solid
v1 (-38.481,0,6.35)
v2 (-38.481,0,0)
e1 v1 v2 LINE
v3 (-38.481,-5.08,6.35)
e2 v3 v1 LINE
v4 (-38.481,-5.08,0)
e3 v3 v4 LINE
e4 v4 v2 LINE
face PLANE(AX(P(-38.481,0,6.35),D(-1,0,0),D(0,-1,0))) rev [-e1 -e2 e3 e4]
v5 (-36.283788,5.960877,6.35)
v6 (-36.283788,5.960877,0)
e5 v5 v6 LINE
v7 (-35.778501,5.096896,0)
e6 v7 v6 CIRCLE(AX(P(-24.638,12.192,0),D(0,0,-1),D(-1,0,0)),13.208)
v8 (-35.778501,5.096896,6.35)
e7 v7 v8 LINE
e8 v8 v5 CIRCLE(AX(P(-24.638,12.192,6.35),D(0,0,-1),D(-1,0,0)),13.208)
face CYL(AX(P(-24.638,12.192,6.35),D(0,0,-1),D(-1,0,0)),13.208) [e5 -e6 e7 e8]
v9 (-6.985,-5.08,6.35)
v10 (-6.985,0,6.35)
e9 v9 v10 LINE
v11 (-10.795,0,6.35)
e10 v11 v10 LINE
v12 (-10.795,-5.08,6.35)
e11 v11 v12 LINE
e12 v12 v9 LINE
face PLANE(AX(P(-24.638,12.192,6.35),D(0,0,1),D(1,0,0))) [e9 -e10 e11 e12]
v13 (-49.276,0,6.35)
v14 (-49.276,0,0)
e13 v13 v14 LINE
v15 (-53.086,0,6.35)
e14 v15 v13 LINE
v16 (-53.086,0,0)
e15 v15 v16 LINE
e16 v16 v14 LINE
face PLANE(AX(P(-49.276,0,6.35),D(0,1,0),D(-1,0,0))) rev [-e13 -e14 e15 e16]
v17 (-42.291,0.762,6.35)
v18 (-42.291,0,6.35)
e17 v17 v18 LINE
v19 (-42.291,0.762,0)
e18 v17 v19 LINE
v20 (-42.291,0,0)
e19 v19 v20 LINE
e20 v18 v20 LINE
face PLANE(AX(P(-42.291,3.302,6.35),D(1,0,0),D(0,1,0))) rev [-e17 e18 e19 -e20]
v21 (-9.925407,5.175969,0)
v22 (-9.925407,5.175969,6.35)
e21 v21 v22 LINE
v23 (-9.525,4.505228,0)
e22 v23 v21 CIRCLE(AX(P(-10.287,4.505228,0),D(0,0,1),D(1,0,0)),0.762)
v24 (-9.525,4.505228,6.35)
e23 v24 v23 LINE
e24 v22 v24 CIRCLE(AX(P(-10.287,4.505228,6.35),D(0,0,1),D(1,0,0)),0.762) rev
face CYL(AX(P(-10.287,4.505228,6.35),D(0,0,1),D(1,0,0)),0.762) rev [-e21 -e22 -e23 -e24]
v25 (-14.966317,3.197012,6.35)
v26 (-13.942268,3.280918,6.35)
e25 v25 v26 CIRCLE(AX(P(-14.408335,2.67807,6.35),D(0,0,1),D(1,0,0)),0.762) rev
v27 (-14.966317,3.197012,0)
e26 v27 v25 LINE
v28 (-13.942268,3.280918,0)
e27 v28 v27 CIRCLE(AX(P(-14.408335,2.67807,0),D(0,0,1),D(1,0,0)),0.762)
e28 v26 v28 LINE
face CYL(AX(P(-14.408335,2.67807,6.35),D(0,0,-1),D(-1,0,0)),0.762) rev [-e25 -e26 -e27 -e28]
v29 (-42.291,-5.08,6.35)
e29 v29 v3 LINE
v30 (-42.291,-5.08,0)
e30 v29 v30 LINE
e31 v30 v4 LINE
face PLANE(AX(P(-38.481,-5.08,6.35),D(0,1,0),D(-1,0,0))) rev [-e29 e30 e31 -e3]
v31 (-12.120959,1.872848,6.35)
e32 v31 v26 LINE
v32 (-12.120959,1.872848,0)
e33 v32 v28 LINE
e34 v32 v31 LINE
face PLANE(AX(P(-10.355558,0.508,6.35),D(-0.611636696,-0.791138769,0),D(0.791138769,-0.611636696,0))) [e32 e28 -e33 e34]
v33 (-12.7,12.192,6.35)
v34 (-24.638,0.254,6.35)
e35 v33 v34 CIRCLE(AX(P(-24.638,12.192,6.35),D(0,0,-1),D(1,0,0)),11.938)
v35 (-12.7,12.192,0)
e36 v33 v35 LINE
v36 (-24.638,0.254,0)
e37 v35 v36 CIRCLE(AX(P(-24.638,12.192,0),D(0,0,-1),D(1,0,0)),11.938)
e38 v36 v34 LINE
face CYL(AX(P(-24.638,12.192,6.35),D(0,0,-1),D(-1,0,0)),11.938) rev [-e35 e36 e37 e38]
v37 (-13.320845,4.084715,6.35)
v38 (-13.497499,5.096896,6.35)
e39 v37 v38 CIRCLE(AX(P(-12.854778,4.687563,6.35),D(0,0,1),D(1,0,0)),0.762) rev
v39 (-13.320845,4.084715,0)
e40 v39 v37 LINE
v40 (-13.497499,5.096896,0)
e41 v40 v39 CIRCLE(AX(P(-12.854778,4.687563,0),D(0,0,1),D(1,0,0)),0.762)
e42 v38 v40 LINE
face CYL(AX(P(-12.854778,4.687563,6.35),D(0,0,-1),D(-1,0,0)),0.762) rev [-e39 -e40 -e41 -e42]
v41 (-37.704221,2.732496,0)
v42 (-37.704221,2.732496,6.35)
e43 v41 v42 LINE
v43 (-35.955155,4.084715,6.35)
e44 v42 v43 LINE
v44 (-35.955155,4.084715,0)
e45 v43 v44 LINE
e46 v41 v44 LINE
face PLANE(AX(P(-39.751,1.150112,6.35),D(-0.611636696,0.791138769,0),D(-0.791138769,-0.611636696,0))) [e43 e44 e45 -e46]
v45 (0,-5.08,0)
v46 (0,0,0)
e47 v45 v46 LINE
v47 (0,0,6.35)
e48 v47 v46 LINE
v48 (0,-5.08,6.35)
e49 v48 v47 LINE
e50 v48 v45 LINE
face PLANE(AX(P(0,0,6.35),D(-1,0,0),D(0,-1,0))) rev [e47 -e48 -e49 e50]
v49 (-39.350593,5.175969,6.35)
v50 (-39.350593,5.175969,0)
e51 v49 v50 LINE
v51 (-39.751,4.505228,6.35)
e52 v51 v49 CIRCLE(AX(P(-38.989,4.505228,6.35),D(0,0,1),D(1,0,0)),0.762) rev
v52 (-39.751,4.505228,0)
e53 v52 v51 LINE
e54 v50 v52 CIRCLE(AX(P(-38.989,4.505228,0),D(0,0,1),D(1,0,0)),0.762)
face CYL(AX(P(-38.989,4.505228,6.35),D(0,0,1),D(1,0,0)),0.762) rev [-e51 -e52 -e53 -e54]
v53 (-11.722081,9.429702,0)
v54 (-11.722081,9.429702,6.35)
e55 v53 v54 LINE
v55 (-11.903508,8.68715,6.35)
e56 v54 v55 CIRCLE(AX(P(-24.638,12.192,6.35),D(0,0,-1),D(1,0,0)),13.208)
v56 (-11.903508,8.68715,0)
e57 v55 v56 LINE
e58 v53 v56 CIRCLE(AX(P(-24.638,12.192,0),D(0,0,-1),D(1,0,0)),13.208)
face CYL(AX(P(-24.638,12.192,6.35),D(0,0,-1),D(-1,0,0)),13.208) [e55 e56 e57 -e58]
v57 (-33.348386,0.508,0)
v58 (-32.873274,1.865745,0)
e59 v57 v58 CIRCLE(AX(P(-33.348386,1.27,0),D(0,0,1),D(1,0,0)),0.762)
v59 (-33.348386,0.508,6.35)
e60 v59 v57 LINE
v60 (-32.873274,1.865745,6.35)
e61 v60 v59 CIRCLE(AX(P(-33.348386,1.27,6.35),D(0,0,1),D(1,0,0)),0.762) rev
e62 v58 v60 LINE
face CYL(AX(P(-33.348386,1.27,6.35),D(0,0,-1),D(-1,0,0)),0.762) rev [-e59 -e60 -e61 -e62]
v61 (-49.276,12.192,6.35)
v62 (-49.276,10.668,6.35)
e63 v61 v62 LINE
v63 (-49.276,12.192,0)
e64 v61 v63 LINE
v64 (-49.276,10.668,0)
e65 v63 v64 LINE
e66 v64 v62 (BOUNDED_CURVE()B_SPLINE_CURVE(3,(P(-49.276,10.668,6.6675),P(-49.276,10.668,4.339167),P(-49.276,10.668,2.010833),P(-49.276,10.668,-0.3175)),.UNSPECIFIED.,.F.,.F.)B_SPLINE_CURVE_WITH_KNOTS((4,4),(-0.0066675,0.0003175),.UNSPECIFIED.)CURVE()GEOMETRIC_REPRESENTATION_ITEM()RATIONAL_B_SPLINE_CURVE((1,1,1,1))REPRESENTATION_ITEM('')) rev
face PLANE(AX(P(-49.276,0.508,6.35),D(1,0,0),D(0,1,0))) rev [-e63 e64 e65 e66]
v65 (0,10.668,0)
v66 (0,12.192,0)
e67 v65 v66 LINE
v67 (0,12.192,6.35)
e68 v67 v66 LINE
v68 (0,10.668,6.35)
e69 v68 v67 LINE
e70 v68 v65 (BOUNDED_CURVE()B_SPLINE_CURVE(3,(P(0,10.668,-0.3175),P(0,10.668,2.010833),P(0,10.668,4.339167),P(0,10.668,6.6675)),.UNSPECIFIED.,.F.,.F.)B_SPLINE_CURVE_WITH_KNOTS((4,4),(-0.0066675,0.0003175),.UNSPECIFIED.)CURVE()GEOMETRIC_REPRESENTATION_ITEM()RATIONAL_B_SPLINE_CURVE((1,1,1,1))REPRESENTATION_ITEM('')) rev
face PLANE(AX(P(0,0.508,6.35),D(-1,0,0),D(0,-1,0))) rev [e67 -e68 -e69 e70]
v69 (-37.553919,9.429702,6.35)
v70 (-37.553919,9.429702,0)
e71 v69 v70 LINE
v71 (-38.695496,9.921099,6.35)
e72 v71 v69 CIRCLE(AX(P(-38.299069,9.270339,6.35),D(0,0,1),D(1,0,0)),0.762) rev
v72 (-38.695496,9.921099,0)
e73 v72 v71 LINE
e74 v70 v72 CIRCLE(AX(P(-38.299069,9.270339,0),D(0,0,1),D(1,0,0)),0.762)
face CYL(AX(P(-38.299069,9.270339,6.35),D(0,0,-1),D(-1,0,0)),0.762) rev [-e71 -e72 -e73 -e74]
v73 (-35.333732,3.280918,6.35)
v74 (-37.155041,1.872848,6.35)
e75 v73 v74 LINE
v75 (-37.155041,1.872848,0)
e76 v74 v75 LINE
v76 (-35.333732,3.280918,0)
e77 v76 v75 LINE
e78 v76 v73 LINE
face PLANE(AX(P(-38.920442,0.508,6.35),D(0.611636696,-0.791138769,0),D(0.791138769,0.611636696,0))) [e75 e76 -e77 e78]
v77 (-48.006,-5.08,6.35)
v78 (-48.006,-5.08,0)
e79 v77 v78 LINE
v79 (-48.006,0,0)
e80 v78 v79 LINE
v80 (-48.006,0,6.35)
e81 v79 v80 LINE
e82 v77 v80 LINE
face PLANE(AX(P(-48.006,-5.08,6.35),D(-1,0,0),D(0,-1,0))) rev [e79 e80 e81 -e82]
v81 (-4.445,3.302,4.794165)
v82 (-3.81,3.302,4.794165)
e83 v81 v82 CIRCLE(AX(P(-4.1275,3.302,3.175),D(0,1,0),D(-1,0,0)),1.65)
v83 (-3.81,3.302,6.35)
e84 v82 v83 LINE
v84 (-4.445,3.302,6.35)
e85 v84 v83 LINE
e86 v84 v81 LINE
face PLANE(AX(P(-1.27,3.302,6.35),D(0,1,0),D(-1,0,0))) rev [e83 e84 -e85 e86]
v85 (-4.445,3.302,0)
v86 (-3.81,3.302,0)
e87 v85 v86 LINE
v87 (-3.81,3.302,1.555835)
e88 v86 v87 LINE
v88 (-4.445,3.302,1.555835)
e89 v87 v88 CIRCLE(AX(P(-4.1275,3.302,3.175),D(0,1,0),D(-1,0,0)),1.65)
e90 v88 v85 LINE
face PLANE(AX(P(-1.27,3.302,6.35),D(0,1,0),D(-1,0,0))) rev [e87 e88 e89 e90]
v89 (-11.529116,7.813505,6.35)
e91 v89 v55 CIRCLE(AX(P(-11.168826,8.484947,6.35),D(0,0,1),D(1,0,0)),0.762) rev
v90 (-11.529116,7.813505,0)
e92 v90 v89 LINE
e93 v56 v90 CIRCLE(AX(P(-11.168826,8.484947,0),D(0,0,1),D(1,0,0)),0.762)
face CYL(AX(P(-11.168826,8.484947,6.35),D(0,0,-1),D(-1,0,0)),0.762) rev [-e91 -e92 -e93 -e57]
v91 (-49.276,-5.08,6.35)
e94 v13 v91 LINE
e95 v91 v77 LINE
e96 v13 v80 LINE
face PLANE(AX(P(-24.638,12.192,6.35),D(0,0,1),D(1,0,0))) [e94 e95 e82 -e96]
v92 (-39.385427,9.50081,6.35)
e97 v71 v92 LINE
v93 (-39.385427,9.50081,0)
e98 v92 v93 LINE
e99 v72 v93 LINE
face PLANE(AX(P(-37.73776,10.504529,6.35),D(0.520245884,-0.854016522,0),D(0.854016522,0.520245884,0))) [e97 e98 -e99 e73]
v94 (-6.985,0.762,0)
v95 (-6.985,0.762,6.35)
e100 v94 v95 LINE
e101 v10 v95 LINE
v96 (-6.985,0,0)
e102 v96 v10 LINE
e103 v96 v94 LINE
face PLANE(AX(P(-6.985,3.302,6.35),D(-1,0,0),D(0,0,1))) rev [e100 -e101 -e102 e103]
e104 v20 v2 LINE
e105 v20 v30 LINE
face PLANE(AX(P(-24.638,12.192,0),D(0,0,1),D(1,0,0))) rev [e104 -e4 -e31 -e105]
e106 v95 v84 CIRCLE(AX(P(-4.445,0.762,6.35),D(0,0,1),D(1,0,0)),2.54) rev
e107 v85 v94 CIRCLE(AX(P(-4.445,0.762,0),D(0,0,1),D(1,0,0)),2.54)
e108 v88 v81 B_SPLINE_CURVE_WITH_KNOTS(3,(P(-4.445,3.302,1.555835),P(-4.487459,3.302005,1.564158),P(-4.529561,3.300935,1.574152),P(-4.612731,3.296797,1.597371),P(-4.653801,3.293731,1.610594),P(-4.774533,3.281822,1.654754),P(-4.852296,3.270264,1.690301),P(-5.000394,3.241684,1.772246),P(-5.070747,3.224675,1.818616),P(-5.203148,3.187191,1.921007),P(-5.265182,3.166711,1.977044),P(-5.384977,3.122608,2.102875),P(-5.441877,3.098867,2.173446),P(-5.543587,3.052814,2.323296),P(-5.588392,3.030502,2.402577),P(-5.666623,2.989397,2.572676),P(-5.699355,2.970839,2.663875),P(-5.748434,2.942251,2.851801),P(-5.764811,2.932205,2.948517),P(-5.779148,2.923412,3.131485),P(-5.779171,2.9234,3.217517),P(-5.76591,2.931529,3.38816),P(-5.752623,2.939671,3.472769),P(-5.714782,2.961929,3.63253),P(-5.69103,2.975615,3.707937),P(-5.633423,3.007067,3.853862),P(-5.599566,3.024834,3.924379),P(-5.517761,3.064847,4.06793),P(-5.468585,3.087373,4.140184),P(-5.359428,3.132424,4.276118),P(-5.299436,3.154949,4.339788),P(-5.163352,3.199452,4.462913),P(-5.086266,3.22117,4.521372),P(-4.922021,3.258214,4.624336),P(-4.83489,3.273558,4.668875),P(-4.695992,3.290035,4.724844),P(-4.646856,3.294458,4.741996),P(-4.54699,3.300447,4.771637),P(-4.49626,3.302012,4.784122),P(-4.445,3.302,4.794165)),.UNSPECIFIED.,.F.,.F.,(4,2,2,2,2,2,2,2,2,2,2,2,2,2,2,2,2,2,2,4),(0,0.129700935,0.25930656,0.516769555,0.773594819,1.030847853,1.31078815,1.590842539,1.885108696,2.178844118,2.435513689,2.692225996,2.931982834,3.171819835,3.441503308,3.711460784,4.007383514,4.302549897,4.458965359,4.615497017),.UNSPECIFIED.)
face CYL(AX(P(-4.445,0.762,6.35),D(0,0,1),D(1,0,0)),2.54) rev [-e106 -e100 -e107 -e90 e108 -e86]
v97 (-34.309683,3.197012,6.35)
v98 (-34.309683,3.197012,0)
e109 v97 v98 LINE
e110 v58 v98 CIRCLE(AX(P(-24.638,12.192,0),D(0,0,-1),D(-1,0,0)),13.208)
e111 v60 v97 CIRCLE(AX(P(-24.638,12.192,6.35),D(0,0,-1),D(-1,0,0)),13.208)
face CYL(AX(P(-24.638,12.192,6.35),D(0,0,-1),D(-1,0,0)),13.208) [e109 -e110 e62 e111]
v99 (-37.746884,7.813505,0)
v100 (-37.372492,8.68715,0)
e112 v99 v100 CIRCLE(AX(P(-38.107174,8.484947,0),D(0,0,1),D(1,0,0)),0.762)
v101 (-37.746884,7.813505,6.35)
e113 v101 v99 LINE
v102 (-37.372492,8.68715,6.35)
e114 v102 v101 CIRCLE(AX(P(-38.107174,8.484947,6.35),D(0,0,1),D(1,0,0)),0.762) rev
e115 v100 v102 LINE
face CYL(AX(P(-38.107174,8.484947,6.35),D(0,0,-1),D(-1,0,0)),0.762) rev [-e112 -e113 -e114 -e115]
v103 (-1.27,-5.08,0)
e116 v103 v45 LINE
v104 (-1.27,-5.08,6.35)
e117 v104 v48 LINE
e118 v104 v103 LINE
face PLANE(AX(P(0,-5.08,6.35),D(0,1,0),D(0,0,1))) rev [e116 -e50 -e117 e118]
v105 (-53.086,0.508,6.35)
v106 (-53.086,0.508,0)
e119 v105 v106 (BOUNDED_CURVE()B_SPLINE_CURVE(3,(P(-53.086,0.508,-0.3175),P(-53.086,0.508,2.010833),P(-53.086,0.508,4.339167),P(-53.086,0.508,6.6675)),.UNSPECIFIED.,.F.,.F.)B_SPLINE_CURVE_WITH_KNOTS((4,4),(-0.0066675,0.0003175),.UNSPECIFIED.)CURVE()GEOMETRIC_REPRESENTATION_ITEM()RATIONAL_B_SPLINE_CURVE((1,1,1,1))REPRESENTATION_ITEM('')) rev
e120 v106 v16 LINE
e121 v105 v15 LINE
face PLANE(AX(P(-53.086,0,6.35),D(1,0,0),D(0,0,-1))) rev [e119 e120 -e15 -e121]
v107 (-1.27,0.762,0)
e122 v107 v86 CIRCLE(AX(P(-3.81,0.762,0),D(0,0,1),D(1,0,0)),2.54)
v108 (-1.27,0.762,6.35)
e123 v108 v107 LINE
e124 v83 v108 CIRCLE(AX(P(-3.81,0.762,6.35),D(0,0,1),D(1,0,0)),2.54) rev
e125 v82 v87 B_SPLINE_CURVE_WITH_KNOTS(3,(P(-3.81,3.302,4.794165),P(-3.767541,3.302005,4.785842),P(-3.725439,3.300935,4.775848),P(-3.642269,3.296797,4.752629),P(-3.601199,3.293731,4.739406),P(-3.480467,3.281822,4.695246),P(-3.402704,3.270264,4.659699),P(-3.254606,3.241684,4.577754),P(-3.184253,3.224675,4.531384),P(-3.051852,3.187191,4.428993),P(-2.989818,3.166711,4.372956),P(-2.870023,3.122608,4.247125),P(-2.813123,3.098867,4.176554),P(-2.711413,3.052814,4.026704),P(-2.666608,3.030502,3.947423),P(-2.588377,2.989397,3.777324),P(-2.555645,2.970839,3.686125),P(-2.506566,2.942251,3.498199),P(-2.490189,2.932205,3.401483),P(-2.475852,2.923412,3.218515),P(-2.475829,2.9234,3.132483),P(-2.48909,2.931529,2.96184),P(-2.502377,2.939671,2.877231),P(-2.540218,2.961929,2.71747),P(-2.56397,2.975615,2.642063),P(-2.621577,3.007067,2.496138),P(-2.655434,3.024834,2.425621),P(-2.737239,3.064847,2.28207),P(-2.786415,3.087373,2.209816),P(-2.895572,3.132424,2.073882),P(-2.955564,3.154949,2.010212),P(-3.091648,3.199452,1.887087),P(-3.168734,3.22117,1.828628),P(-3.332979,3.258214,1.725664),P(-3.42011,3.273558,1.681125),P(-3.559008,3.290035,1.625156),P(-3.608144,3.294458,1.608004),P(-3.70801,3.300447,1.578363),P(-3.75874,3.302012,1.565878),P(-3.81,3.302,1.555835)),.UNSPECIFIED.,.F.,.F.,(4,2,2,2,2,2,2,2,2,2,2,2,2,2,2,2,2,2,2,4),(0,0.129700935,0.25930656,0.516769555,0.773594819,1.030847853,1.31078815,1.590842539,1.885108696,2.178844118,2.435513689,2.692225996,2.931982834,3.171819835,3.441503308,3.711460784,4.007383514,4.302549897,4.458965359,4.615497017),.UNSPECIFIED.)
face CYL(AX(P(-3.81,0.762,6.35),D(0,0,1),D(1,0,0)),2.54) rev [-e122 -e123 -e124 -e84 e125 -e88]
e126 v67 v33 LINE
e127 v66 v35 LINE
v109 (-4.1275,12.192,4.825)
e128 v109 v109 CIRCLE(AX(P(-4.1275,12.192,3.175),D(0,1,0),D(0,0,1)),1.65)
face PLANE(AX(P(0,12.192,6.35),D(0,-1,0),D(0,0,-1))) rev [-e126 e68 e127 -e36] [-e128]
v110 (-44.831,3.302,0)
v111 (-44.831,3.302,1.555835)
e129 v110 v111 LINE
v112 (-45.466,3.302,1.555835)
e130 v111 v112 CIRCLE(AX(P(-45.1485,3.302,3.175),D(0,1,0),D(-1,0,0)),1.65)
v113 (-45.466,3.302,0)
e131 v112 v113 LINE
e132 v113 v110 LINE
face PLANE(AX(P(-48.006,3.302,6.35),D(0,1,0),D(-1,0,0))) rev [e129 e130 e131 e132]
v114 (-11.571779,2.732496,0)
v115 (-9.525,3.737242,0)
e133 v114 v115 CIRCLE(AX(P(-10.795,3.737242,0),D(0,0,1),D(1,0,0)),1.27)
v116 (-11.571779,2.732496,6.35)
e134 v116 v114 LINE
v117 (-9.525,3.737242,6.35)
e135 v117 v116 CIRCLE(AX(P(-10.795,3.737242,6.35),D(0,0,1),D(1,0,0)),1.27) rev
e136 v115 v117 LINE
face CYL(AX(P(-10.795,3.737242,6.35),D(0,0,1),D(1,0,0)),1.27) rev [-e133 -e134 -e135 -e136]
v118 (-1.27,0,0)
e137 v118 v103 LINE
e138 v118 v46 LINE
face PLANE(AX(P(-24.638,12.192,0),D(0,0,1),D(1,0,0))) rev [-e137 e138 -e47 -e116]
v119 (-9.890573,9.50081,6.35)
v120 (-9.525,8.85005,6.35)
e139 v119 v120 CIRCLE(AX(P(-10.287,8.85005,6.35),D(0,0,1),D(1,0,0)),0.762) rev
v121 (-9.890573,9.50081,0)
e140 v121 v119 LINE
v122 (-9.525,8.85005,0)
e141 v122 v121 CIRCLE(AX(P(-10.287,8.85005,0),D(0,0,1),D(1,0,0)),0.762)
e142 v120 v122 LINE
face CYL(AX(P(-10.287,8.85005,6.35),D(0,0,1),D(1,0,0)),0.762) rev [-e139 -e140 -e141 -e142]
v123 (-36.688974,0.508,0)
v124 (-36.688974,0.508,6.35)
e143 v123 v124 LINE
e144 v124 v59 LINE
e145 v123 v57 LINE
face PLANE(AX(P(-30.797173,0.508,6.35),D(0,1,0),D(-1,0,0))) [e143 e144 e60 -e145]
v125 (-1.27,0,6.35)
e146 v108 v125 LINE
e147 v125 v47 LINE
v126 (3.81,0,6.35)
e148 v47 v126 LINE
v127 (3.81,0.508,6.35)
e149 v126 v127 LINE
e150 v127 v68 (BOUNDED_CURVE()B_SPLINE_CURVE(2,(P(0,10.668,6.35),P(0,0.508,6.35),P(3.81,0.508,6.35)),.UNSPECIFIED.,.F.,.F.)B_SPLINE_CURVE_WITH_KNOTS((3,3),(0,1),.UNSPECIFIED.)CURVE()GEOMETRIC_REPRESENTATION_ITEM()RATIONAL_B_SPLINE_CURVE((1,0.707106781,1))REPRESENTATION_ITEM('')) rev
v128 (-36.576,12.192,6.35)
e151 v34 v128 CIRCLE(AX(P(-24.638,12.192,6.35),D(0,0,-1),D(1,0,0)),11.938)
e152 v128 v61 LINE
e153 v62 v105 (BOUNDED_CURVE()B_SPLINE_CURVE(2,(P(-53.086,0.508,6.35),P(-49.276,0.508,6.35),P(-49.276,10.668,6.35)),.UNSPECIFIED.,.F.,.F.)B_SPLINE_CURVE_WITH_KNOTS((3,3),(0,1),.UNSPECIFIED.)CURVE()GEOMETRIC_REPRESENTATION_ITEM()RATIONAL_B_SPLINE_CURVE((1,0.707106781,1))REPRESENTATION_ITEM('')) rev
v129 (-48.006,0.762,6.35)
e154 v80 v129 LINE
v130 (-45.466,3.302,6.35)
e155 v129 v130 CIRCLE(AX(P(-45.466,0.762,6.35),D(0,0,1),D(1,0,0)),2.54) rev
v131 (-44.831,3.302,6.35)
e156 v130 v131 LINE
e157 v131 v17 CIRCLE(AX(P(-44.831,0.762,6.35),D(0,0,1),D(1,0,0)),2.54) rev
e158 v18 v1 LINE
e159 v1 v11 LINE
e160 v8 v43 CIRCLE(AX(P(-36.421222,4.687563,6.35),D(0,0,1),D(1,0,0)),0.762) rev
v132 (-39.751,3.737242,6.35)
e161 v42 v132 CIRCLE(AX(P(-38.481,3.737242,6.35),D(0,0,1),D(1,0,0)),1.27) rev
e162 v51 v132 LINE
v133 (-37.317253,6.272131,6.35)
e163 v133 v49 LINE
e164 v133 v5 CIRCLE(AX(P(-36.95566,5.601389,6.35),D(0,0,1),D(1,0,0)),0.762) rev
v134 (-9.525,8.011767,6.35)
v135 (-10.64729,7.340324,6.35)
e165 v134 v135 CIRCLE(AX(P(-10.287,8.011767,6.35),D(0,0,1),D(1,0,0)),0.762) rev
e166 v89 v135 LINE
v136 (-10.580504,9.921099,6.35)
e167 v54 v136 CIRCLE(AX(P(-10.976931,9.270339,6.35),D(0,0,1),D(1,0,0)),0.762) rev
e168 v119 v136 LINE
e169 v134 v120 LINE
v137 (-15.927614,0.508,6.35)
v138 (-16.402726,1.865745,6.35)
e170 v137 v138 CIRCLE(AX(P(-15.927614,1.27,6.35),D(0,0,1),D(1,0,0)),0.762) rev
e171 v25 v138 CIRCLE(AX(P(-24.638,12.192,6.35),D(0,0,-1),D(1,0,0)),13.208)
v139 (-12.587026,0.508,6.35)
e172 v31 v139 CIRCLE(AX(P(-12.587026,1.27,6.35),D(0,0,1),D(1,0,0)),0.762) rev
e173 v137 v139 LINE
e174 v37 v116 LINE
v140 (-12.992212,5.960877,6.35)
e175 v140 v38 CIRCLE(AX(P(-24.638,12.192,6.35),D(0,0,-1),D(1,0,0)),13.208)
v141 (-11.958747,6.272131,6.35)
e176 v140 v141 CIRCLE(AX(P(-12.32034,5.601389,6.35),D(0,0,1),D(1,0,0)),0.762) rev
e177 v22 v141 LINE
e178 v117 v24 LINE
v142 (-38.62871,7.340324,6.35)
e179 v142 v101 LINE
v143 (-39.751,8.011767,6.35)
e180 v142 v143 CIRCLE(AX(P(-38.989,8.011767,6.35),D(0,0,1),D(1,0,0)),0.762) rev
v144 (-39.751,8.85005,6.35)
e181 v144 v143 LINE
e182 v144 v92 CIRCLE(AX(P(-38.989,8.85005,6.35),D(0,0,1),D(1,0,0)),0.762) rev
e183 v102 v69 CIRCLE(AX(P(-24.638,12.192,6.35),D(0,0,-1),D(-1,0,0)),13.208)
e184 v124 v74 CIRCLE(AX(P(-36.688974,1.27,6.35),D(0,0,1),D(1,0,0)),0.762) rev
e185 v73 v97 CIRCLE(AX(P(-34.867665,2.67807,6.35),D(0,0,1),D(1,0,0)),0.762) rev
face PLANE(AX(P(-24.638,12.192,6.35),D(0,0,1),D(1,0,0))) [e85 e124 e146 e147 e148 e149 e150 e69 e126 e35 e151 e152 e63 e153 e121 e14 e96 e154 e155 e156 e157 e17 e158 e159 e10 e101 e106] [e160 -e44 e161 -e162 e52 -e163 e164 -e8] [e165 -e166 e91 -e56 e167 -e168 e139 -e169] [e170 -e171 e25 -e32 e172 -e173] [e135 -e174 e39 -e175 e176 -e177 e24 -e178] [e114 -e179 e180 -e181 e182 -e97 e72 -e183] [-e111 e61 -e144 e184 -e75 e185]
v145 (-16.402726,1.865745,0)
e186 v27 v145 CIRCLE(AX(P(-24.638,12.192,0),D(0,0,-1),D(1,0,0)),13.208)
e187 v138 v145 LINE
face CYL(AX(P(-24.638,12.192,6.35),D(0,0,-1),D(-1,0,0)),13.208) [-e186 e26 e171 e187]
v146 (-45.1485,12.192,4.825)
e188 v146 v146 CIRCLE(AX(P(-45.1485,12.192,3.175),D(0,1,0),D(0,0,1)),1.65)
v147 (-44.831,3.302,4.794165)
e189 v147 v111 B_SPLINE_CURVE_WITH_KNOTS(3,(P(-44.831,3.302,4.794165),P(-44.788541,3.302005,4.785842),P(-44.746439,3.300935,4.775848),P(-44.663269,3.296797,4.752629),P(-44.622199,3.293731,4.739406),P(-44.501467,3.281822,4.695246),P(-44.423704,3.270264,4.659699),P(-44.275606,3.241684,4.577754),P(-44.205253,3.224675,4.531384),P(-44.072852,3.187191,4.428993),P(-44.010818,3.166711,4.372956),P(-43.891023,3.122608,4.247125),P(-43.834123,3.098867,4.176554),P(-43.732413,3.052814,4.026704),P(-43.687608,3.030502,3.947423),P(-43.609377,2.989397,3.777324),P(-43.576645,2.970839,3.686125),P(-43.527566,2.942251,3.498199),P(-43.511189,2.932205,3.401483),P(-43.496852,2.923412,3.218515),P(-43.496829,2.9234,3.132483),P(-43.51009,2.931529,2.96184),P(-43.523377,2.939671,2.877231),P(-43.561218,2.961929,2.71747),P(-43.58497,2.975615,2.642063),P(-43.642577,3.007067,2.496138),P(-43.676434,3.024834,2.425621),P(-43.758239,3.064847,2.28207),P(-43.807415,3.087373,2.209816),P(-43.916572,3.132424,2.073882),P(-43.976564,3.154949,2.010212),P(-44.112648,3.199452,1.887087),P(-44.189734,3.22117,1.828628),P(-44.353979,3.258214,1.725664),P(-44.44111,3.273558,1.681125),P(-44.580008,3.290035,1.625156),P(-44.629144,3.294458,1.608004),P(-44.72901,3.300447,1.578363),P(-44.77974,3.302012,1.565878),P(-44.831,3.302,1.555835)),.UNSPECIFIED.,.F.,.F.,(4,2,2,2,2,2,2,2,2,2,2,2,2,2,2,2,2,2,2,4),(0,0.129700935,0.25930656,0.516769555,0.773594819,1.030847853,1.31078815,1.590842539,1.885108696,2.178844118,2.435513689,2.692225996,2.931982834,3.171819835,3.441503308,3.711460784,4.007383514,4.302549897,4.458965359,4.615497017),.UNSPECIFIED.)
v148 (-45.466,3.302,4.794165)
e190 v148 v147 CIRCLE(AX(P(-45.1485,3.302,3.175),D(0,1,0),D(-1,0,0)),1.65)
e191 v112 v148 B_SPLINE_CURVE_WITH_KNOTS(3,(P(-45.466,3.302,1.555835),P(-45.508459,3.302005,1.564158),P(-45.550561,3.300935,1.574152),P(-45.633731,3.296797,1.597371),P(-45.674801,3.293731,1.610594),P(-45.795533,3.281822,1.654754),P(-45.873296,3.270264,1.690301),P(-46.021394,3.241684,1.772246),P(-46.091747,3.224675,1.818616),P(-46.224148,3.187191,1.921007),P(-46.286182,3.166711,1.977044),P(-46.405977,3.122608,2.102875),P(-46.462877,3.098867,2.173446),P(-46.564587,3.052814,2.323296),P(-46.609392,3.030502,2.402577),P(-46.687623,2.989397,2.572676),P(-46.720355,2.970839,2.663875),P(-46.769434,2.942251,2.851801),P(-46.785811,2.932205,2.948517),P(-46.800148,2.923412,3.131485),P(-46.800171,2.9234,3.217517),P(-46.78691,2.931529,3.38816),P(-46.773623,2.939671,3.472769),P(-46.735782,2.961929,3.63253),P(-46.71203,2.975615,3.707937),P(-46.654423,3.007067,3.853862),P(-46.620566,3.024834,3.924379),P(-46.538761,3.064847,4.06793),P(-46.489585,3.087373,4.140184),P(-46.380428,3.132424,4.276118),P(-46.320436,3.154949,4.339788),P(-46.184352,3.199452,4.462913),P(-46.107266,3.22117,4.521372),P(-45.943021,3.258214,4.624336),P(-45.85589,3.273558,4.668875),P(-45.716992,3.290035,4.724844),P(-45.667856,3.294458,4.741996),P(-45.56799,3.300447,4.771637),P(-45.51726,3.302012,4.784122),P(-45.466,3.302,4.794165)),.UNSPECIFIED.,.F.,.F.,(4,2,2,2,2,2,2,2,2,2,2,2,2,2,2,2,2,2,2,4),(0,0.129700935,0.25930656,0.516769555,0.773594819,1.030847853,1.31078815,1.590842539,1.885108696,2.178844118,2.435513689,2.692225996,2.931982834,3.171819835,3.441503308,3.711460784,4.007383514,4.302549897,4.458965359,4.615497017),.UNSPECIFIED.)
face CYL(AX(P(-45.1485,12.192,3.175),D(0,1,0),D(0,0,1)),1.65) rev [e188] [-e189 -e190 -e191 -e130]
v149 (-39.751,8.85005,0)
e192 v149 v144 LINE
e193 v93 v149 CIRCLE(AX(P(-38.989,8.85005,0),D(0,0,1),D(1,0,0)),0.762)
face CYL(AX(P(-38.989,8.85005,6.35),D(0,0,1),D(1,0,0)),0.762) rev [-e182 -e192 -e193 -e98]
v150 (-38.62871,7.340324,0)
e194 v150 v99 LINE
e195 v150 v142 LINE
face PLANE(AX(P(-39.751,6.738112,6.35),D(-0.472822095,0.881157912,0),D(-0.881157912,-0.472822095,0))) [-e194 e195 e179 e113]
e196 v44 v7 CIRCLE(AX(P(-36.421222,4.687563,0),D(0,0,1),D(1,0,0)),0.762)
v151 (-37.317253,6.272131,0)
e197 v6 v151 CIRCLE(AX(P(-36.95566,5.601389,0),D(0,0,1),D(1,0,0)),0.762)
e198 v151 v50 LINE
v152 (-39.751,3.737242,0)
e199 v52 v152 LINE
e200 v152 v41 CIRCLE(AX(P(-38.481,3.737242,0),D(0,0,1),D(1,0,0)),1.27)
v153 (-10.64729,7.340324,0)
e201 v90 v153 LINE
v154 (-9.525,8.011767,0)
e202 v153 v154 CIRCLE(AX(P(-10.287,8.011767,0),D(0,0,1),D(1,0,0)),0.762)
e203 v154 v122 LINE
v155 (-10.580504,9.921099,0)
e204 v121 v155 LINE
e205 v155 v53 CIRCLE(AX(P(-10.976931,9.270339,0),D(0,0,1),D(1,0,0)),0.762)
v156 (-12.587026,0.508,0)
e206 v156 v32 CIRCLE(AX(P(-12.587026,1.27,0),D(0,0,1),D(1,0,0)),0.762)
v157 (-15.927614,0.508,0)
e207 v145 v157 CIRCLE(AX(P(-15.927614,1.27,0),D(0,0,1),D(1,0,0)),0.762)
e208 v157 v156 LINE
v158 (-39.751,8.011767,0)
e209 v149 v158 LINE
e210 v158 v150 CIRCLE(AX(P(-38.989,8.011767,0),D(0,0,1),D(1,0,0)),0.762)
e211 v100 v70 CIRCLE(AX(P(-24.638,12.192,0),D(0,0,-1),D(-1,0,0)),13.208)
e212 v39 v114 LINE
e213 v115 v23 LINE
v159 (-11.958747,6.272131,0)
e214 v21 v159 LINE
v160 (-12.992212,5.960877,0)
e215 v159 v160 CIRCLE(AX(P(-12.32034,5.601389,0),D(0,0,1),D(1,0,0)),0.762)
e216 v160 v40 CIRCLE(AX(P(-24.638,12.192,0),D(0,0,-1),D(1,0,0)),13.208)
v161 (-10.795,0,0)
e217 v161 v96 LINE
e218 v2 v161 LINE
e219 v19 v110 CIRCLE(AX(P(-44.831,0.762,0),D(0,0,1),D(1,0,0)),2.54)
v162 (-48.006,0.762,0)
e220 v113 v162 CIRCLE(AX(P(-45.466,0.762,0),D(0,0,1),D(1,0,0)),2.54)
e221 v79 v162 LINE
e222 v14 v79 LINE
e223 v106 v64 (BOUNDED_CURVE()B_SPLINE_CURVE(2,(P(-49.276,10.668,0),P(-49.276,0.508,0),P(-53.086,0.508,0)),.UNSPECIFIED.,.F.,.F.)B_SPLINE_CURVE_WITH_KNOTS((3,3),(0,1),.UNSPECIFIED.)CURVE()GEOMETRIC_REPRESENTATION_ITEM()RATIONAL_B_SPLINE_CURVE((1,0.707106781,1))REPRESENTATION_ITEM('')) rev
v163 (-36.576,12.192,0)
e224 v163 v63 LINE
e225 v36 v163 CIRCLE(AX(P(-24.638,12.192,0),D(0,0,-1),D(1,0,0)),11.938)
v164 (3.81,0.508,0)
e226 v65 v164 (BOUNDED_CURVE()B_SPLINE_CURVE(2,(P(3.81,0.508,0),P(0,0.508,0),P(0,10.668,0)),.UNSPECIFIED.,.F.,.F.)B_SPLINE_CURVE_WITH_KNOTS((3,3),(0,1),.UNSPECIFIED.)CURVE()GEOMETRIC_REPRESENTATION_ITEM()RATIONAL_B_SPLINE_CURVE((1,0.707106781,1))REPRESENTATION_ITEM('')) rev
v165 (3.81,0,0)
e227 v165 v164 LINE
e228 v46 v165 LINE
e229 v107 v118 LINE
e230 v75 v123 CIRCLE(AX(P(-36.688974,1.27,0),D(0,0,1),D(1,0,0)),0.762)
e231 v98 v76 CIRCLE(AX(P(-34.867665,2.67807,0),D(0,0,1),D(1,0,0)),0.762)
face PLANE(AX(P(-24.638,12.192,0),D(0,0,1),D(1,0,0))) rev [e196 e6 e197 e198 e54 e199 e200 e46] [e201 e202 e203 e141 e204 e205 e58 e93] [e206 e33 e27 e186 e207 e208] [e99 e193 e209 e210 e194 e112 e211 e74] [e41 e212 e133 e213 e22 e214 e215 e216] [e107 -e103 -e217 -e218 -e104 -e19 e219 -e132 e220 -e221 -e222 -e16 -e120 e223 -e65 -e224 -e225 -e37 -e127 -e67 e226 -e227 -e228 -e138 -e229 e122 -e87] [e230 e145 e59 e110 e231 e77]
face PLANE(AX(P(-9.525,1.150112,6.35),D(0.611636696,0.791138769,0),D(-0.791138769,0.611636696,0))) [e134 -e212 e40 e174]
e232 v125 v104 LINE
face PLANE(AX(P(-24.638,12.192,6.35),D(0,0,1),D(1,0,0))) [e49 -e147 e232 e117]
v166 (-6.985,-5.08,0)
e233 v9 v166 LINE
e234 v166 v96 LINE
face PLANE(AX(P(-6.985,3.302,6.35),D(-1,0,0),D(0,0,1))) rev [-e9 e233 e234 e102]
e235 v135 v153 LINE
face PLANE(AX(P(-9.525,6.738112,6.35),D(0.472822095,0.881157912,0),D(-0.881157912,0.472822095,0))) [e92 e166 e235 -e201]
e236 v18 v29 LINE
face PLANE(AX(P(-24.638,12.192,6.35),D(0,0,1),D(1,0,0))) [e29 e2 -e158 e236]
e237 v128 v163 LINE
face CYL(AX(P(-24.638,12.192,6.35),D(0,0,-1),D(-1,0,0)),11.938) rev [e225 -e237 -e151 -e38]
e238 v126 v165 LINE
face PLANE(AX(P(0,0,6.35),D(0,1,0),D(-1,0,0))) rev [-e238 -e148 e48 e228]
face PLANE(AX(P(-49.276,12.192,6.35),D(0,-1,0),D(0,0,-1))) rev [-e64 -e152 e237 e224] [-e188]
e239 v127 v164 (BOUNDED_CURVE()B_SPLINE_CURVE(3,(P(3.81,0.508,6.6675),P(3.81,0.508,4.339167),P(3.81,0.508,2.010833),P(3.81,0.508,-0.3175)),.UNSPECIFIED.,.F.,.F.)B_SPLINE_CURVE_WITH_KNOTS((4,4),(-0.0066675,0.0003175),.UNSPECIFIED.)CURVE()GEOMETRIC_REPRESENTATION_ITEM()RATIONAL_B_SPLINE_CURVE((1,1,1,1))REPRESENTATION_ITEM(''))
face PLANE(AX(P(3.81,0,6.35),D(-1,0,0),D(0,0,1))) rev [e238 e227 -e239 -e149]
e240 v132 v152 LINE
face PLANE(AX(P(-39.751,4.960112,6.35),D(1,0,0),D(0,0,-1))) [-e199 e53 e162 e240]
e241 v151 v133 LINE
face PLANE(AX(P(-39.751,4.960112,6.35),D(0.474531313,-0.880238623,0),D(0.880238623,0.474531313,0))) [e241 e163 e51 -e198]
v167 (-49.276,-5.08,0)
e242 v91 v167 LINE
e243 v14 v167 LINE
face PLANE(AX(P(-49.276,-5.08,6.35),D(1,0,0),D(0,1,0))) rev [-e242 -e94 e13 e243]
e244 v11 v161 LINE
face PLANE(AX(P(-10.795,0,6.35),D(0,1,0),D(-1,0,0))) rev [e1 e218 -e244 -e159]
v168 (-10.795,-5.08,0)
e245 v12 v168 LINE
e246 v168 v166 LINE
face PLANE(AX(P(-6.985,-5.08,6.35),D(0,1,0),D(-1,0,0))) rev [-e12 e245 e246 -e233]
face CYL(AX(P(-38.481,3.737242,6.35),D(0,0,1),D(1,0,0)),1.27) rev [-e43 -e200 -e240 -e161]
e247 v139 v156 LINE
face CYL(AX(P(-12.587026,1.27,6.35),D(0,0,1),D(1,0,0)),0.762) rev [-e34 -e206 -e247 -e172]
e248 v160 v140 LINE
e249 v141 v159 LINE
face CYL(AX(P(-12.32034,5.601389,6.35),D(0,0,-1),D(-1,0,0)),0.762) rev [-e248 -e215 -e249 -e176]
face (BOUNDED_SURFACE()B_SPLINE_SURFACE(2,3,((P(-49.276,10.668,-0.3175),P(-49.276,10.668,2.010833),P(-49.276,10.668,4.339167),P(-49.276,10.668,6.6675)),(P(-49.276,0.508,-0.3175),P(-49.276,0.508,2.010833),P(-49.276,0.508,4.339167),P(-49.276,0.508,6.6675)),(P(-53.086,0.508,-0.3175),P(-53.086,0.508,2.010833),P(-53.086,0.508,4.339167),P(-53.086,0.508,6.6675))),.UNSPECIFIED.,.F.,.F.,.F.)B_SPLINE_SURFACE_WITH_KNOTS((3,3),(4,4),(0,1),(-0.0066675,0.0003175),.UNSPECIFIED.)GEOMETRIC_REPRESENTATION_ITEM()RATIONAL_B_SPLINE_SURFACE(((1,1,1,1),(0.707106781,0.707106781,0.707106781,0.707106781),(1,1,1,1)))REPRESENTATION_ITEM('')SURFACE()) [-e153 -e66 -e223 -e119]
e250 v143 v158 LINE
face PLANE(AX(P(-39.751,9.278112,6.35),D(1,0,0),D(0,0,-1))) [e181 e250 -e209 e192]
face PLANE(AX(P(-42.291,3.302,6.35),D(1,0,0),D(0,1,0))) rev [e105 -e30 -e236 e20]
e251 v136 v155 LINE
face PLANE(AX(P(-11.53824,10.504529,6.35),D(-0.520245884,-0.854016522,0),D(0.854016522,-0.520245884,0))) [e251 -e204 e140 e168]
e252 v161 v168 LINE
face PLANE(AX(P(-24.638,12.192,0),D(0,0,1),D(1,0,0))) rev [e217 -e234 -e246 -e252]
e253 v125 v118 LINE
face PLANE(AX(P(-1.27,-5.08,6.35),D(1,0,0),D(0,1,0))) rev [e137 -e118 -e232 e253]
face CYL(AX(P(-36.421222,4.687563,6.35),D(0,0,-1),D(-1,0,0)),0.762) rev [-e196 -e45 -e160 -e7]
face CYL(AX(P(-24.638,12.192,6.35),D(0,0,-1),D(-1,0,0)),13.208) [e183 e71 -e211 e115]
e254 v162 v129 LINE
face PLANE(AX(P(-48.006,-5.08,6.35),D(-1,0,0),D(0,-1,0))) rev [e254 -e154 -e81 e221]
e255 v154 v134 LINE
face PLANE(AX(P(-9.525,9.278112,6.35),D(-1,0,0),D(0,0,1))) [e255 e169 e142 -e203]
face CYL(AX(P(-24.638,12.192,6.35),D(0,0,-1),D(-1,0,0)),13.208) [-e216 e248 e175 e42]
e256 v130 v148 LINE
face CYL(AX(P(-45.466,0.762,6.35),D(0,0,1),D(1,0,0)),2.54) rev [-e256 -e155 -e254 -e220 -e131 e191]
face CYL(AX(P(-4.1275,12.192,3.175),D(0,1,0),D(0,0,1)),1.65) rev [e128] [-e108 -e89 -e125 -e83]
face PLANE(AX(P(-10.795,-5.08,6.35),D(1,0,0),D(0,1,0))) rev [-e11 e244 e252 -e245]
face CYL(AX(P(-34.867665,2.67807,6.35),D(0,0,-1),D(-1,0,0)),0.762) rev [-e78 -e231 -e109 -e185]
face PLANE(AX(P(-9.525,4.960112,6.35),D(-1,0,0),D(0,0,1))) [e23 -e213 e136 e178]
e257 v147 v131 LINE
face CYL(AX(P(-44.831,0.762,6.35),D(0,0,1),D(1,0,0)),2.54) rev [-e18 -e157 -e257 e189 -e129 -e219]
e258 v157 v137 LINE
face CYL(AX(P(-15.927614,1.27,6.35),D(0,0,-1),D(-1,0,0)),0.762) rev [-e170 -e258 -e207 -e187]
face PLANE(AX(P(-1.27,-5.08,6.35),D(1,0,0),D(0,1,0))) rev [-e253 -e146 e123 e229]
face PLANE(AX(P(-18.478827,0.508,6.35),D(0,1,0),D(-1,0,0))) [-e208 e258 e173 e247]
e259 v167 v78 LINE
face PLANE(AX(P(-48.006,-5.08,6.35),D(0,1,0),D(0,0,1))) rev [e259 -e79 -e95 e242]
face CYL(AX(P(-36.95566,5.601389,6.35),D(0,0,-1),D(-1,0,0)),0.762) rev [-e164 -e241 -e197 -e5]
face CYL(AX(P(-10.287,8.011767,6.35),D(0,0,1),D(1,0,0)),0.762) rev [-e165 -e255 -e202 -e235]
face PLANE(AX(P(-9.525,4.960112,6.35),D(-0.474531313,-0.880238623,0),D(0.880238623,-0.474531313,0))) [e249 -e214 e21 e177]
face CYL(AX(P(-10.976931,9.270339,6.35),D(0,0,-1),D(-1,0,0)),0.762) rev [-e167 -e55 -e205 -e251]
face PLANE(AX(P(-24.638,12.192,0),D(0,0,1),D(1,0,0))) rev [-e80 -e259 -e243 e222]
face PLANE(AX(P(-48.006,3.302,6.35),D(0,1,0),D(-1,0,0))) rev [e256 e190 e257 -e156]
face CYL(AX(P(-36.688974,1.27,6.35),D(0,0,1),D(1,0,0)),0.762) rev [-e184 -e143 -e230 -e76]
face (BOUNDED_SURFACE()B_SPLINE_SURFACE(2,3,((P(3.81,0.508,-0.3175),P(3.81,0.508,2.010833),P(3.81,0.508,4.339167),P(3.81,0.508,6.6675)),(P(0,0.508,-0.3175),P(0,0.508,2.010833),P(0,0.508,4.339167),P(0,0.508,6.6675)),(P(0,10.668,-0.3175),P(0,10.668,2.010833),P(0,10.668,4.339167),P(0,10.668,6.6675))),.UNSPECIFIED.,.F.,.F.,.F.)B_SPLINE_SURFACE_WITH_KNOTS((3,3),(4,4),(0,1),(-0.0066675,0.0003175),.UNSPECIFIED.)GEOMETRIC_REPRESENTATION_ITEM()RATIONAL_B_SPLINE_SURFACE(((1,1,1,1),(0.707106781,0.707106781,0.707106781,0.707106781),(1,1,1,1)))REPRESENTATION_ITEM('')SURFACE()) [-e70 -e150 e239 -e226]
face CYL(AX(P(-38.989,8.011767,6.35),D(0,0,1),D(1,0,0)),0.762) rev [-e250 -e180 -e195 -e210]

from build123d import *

# Parameters (mm, degrees)
BOSS_EXTRUDE1_DEPTH   = 6.35
FILLET2_R             = 2.54
FILLET5_SIZE          = 10.16
FILLET5_SIZE_2        = 3.81
FILLET3_R             = 0.762
FILLET4_R             = 1.27
M4X0_7_TAPPED_HOLE1_D = 3.3


with BuildPart() as part:
    # Sketch1 → Boss-Extrude1 (new body)
    with BuildSketch(Plane.XY):
        with BuildLine():
            Line((-49.276, 0.508), (-49.276, 12.192))
            Line((-49.276, 12.192), (-36.576, 12.192))
            ThreePointArc((-36.576, 12.192), (-24.638, 0.254), (-12.7, 12.192))
            Line((-12.7, 12.192), (0, 12.192))
            Line((0, 12.192), (0, 0.508))
            Line((0, 0.508), (3.81, 0.508))
            Line((3.81, 0.508), (3.81, 0))
            Line((3.81, 0), (0, 0))
            Line((0, 0), (0, -5.08))
            Line((0, -5.08), (-1.27, -5.08))
            Line((-1.27, -5.08), (-1.27, 3.302))
            Line((-1.27, 3.302), (-6.985, 3.302))
            Line((-6.985, 3.302), (-6.985, -5.08))
            Line((-6.985, -5.08), (-10.795, -5.08))
            Line((-10.795, -5.08), (-10.795, 0))
            Line((-10.795, 0), (-38.481, 0))
            Line((-38.481, 0), (-38.481, -5.08))
            Line((-38.481, -5.08), (-42.291, -5.08))
            Line((-42.291, -5.08), (-42.291, 3.302))
            Line((-42.291, 3.302), (-48.006, 3.302))
            Line((-48.006, 3.302), (-48.006, -5.08))
            Line((-48.006, -5.08), (-49.276, -5.08))
            Line((-49.276, -5.08), (-49.276, 0))
            Line((-49.276, 0), (-53.086, 0))
            Line((-53.086, 0), (-53.086, 0.508))
            Line((-53.086, 0.508), (-49.276, 0.508))
        make_face()
        with BuildLine():
            Line((-18.478827328, 0.508), (-10.355558408, 0.508))
            Line((-10.355558408, 0.508), (-14.507082252, 3.71758146))
            ThreePointArc((-14.507082252, 3.71758146), (-16.336366742, 1.919018483), (-18.478827328, 0.508))
        make_face(mode=Mode.SUBTRACT)
        with BuildLine():
            Line((-9.525, 1.150112382), (-13.88565937, 4.52137845))
            ThreePointArc((-13.88565937, 4.52137845), (-13.218881773, 5.554605714), (-12.651085576, 6.645366193))
            Line((-12.651085576, 6.645366193), (-9.525, 4.960112382))
            Line((-9.525, 4.960112382), (-9.525, 1.150112382))
        make_face(mode=Mode.SUBTRACT)
        with BuildLine():
            Line((-9.525, 6.738112382), (-12.07736066, 8.107688139))
            ThreePointArc((-12.07736066, 8.107688139), (-11.751952055, 9.293546556), (-11.53824026, 10.504528889))
            Line((-11.53824026, 10.504528889), (-9.525, 9.278112382))
            Line((-9.525, 9.278112382), (-9.525, 6.738112382))
        make_face(mode=Mode.SUBTRACT)
        with BuildLine():
            Line((-39.751, 9.278112382), (-39.751, 6.738112382))
            Line((-39.751, 6.738112382), (-37.19863934, 8.107688139))
            ThreePointArc((-37.19863934, 8.107688139), (-37.524047945, 9.293546556), (-37.73775974, 10.504528889))
            Line((-37.73775974, 10.504528889), (-39.751, 9.278112382))
        make_face(mode=Mode.SUBTRACT)
        with BuildLine():
            Line((-39.751, 4.960112382), (-39.751, 1.150112382))
            Line((-39.751, 1.150112382), (-35.39034063, 4.52137845))
            ThreePointArc((-35.39034063, 4.52137845), (-36.057118227, 5.554605714), (-36.624914424, 6.645366193))
            Line((-36.624914424, 6.645366193), (-39.751, 4.960112382))
        make_face(mode=Mode.SUBTRACT)
        with BuildLine():
            Line((-30.797172672, 0.508), (-38.920441592, 0.508))
            Line((-38.920441592, 0.508), (-34.768917748, 3.71758146))
            ThreePointArc((-34.768917748, 3.71758146), (-32.939633258, 1.919018483), (-30.797172672, 0.508))
        make_face(mode=Mode.SUBTRACT)
    extrude(amount=BOSS_EXTRUDE1_DEPTH)

    # Fillet2
    fillet2_edges = [part.edges().sort_by_distance(p)[0] for p in [
        (-1.27, 3.302, 3.175),
        (-6.985, 3.302, 3.175),
        (-42.291, 3.302, 3.175),
        (-48.006, 3.302, 3.175),
    ]]
    fillet(fillet2_edges, radius=FILLET2_R)

    # Fillet5
    # an asymmetric fillet: 10.16, 3.81 mm, written as the material it adds along each edge
    with BuildSketch(Plane(origin=(0, 0.508, 0), x_dir=(0, 1, 0), z_dir=(0, 0, 1))) as fillet5_piece_1:
        with BuildLine():
            Bezier((FILLET5_SIZE, 0), (0, 0), (0, -FILLET5_SIZE_2), weights=[1, 0.707106781, 1])
            Line((0, -FILLET5_SIZE_2), (0, 0))
            Line((0, 0), (FILLET5_SIZE, 0))
        make_face()
    extrude(amount=6.35)
    with BuildSketch(Plane(origin=(-49.276, 0.508, 0), x_dir=(-1, 0, 0), z_dir=(0, 0, 1))) as fillet5_piece_2:
        with BuildLine():
            Bezier((FILLET5_SIZE_2, 0), (0, 0), (0, -FILLET5_SIZE), weights=[1, 0.707106781, 1])
            Line((0, -FILLET5_SIZE), (0, 0))
            Line((0, 0), (FILLET5_SIZE_2, 0))
        make_face()
    extrude(amount=6.35)

    # Fillet3
    fillet3_edges = [part.edges().sort_by_distance(p)[0] for p in [
        (-9.525, 6.738112382, 3.175),
        (-9.525, 9.278112382, 3.175),
        (-11.53824026, 10.504528889, 3.175),
        (-12.07736066, 8.107688139, 3.175),
        (-36.624914424, 6.645366193, 3.175),
        (-39.751, 4.960112382, 3.175),
        (-35.39034063, 4.52137845, 3.175),
        (-30.797172672, 0.508, 3.175),
        (-34.768917748, 3.71758146, 3.175),
        (-38.920441592, 0.508, 3.175),
        (-14.507082252, 3.71758146, 3.175),
        (-18.478827328, 0.508, 3.175),
        (-10.355558408, 0.508, 3.175),
        (-37.73775974, 10.504528889, 3.175),
        (-39.751, 9.278112382, 3.175),
        (-39.751, 6.738112382, 3.175),
        (-37.19863934, 8.107688139, 3.175),
        (-9.525, 4.960112382, 3.175),
        (-12.651085576, 6.645366193, 3.175),
        (-13.88565937, 4.52137845, 3.175),
    ]]
    fillet(fillet3_edges, radius=FILLET3_R)

    # Fillet4
    fillet4_edges = [part.edges().sort_by_distance(p)[0] for p in [
        (-39.751, 1.150112382, 3.175),
        (-9.525, 1.150112382, 3.175),
    ]]
    fillet(fillet4_edges, radius=FILLET4_R)

    # M4x0.7 Tapped Hole1 (through all)
    with Locations(Plane(origin=(0, 12.192, 0), x_dir=(1, 0, 0), z_dir=(0, 1, 0))):
        with Locations((-4.1275, -3.175)):
            m4x0_7_tapped_hole1 = Hole(M4X0_7_TAPPED_HOLE1_D / 2)

    # Mirror1: M4x0.7 Tapped Hole1 across plane
    add(m4x0_7_tapped_hole1.mirror(Plane(origin=(-24.638, 0, 0), x_dir=(0, 0, 1), z_dir=(1, 0, 0))), mode=Mode.SUBTRACT)


solid = part.part
